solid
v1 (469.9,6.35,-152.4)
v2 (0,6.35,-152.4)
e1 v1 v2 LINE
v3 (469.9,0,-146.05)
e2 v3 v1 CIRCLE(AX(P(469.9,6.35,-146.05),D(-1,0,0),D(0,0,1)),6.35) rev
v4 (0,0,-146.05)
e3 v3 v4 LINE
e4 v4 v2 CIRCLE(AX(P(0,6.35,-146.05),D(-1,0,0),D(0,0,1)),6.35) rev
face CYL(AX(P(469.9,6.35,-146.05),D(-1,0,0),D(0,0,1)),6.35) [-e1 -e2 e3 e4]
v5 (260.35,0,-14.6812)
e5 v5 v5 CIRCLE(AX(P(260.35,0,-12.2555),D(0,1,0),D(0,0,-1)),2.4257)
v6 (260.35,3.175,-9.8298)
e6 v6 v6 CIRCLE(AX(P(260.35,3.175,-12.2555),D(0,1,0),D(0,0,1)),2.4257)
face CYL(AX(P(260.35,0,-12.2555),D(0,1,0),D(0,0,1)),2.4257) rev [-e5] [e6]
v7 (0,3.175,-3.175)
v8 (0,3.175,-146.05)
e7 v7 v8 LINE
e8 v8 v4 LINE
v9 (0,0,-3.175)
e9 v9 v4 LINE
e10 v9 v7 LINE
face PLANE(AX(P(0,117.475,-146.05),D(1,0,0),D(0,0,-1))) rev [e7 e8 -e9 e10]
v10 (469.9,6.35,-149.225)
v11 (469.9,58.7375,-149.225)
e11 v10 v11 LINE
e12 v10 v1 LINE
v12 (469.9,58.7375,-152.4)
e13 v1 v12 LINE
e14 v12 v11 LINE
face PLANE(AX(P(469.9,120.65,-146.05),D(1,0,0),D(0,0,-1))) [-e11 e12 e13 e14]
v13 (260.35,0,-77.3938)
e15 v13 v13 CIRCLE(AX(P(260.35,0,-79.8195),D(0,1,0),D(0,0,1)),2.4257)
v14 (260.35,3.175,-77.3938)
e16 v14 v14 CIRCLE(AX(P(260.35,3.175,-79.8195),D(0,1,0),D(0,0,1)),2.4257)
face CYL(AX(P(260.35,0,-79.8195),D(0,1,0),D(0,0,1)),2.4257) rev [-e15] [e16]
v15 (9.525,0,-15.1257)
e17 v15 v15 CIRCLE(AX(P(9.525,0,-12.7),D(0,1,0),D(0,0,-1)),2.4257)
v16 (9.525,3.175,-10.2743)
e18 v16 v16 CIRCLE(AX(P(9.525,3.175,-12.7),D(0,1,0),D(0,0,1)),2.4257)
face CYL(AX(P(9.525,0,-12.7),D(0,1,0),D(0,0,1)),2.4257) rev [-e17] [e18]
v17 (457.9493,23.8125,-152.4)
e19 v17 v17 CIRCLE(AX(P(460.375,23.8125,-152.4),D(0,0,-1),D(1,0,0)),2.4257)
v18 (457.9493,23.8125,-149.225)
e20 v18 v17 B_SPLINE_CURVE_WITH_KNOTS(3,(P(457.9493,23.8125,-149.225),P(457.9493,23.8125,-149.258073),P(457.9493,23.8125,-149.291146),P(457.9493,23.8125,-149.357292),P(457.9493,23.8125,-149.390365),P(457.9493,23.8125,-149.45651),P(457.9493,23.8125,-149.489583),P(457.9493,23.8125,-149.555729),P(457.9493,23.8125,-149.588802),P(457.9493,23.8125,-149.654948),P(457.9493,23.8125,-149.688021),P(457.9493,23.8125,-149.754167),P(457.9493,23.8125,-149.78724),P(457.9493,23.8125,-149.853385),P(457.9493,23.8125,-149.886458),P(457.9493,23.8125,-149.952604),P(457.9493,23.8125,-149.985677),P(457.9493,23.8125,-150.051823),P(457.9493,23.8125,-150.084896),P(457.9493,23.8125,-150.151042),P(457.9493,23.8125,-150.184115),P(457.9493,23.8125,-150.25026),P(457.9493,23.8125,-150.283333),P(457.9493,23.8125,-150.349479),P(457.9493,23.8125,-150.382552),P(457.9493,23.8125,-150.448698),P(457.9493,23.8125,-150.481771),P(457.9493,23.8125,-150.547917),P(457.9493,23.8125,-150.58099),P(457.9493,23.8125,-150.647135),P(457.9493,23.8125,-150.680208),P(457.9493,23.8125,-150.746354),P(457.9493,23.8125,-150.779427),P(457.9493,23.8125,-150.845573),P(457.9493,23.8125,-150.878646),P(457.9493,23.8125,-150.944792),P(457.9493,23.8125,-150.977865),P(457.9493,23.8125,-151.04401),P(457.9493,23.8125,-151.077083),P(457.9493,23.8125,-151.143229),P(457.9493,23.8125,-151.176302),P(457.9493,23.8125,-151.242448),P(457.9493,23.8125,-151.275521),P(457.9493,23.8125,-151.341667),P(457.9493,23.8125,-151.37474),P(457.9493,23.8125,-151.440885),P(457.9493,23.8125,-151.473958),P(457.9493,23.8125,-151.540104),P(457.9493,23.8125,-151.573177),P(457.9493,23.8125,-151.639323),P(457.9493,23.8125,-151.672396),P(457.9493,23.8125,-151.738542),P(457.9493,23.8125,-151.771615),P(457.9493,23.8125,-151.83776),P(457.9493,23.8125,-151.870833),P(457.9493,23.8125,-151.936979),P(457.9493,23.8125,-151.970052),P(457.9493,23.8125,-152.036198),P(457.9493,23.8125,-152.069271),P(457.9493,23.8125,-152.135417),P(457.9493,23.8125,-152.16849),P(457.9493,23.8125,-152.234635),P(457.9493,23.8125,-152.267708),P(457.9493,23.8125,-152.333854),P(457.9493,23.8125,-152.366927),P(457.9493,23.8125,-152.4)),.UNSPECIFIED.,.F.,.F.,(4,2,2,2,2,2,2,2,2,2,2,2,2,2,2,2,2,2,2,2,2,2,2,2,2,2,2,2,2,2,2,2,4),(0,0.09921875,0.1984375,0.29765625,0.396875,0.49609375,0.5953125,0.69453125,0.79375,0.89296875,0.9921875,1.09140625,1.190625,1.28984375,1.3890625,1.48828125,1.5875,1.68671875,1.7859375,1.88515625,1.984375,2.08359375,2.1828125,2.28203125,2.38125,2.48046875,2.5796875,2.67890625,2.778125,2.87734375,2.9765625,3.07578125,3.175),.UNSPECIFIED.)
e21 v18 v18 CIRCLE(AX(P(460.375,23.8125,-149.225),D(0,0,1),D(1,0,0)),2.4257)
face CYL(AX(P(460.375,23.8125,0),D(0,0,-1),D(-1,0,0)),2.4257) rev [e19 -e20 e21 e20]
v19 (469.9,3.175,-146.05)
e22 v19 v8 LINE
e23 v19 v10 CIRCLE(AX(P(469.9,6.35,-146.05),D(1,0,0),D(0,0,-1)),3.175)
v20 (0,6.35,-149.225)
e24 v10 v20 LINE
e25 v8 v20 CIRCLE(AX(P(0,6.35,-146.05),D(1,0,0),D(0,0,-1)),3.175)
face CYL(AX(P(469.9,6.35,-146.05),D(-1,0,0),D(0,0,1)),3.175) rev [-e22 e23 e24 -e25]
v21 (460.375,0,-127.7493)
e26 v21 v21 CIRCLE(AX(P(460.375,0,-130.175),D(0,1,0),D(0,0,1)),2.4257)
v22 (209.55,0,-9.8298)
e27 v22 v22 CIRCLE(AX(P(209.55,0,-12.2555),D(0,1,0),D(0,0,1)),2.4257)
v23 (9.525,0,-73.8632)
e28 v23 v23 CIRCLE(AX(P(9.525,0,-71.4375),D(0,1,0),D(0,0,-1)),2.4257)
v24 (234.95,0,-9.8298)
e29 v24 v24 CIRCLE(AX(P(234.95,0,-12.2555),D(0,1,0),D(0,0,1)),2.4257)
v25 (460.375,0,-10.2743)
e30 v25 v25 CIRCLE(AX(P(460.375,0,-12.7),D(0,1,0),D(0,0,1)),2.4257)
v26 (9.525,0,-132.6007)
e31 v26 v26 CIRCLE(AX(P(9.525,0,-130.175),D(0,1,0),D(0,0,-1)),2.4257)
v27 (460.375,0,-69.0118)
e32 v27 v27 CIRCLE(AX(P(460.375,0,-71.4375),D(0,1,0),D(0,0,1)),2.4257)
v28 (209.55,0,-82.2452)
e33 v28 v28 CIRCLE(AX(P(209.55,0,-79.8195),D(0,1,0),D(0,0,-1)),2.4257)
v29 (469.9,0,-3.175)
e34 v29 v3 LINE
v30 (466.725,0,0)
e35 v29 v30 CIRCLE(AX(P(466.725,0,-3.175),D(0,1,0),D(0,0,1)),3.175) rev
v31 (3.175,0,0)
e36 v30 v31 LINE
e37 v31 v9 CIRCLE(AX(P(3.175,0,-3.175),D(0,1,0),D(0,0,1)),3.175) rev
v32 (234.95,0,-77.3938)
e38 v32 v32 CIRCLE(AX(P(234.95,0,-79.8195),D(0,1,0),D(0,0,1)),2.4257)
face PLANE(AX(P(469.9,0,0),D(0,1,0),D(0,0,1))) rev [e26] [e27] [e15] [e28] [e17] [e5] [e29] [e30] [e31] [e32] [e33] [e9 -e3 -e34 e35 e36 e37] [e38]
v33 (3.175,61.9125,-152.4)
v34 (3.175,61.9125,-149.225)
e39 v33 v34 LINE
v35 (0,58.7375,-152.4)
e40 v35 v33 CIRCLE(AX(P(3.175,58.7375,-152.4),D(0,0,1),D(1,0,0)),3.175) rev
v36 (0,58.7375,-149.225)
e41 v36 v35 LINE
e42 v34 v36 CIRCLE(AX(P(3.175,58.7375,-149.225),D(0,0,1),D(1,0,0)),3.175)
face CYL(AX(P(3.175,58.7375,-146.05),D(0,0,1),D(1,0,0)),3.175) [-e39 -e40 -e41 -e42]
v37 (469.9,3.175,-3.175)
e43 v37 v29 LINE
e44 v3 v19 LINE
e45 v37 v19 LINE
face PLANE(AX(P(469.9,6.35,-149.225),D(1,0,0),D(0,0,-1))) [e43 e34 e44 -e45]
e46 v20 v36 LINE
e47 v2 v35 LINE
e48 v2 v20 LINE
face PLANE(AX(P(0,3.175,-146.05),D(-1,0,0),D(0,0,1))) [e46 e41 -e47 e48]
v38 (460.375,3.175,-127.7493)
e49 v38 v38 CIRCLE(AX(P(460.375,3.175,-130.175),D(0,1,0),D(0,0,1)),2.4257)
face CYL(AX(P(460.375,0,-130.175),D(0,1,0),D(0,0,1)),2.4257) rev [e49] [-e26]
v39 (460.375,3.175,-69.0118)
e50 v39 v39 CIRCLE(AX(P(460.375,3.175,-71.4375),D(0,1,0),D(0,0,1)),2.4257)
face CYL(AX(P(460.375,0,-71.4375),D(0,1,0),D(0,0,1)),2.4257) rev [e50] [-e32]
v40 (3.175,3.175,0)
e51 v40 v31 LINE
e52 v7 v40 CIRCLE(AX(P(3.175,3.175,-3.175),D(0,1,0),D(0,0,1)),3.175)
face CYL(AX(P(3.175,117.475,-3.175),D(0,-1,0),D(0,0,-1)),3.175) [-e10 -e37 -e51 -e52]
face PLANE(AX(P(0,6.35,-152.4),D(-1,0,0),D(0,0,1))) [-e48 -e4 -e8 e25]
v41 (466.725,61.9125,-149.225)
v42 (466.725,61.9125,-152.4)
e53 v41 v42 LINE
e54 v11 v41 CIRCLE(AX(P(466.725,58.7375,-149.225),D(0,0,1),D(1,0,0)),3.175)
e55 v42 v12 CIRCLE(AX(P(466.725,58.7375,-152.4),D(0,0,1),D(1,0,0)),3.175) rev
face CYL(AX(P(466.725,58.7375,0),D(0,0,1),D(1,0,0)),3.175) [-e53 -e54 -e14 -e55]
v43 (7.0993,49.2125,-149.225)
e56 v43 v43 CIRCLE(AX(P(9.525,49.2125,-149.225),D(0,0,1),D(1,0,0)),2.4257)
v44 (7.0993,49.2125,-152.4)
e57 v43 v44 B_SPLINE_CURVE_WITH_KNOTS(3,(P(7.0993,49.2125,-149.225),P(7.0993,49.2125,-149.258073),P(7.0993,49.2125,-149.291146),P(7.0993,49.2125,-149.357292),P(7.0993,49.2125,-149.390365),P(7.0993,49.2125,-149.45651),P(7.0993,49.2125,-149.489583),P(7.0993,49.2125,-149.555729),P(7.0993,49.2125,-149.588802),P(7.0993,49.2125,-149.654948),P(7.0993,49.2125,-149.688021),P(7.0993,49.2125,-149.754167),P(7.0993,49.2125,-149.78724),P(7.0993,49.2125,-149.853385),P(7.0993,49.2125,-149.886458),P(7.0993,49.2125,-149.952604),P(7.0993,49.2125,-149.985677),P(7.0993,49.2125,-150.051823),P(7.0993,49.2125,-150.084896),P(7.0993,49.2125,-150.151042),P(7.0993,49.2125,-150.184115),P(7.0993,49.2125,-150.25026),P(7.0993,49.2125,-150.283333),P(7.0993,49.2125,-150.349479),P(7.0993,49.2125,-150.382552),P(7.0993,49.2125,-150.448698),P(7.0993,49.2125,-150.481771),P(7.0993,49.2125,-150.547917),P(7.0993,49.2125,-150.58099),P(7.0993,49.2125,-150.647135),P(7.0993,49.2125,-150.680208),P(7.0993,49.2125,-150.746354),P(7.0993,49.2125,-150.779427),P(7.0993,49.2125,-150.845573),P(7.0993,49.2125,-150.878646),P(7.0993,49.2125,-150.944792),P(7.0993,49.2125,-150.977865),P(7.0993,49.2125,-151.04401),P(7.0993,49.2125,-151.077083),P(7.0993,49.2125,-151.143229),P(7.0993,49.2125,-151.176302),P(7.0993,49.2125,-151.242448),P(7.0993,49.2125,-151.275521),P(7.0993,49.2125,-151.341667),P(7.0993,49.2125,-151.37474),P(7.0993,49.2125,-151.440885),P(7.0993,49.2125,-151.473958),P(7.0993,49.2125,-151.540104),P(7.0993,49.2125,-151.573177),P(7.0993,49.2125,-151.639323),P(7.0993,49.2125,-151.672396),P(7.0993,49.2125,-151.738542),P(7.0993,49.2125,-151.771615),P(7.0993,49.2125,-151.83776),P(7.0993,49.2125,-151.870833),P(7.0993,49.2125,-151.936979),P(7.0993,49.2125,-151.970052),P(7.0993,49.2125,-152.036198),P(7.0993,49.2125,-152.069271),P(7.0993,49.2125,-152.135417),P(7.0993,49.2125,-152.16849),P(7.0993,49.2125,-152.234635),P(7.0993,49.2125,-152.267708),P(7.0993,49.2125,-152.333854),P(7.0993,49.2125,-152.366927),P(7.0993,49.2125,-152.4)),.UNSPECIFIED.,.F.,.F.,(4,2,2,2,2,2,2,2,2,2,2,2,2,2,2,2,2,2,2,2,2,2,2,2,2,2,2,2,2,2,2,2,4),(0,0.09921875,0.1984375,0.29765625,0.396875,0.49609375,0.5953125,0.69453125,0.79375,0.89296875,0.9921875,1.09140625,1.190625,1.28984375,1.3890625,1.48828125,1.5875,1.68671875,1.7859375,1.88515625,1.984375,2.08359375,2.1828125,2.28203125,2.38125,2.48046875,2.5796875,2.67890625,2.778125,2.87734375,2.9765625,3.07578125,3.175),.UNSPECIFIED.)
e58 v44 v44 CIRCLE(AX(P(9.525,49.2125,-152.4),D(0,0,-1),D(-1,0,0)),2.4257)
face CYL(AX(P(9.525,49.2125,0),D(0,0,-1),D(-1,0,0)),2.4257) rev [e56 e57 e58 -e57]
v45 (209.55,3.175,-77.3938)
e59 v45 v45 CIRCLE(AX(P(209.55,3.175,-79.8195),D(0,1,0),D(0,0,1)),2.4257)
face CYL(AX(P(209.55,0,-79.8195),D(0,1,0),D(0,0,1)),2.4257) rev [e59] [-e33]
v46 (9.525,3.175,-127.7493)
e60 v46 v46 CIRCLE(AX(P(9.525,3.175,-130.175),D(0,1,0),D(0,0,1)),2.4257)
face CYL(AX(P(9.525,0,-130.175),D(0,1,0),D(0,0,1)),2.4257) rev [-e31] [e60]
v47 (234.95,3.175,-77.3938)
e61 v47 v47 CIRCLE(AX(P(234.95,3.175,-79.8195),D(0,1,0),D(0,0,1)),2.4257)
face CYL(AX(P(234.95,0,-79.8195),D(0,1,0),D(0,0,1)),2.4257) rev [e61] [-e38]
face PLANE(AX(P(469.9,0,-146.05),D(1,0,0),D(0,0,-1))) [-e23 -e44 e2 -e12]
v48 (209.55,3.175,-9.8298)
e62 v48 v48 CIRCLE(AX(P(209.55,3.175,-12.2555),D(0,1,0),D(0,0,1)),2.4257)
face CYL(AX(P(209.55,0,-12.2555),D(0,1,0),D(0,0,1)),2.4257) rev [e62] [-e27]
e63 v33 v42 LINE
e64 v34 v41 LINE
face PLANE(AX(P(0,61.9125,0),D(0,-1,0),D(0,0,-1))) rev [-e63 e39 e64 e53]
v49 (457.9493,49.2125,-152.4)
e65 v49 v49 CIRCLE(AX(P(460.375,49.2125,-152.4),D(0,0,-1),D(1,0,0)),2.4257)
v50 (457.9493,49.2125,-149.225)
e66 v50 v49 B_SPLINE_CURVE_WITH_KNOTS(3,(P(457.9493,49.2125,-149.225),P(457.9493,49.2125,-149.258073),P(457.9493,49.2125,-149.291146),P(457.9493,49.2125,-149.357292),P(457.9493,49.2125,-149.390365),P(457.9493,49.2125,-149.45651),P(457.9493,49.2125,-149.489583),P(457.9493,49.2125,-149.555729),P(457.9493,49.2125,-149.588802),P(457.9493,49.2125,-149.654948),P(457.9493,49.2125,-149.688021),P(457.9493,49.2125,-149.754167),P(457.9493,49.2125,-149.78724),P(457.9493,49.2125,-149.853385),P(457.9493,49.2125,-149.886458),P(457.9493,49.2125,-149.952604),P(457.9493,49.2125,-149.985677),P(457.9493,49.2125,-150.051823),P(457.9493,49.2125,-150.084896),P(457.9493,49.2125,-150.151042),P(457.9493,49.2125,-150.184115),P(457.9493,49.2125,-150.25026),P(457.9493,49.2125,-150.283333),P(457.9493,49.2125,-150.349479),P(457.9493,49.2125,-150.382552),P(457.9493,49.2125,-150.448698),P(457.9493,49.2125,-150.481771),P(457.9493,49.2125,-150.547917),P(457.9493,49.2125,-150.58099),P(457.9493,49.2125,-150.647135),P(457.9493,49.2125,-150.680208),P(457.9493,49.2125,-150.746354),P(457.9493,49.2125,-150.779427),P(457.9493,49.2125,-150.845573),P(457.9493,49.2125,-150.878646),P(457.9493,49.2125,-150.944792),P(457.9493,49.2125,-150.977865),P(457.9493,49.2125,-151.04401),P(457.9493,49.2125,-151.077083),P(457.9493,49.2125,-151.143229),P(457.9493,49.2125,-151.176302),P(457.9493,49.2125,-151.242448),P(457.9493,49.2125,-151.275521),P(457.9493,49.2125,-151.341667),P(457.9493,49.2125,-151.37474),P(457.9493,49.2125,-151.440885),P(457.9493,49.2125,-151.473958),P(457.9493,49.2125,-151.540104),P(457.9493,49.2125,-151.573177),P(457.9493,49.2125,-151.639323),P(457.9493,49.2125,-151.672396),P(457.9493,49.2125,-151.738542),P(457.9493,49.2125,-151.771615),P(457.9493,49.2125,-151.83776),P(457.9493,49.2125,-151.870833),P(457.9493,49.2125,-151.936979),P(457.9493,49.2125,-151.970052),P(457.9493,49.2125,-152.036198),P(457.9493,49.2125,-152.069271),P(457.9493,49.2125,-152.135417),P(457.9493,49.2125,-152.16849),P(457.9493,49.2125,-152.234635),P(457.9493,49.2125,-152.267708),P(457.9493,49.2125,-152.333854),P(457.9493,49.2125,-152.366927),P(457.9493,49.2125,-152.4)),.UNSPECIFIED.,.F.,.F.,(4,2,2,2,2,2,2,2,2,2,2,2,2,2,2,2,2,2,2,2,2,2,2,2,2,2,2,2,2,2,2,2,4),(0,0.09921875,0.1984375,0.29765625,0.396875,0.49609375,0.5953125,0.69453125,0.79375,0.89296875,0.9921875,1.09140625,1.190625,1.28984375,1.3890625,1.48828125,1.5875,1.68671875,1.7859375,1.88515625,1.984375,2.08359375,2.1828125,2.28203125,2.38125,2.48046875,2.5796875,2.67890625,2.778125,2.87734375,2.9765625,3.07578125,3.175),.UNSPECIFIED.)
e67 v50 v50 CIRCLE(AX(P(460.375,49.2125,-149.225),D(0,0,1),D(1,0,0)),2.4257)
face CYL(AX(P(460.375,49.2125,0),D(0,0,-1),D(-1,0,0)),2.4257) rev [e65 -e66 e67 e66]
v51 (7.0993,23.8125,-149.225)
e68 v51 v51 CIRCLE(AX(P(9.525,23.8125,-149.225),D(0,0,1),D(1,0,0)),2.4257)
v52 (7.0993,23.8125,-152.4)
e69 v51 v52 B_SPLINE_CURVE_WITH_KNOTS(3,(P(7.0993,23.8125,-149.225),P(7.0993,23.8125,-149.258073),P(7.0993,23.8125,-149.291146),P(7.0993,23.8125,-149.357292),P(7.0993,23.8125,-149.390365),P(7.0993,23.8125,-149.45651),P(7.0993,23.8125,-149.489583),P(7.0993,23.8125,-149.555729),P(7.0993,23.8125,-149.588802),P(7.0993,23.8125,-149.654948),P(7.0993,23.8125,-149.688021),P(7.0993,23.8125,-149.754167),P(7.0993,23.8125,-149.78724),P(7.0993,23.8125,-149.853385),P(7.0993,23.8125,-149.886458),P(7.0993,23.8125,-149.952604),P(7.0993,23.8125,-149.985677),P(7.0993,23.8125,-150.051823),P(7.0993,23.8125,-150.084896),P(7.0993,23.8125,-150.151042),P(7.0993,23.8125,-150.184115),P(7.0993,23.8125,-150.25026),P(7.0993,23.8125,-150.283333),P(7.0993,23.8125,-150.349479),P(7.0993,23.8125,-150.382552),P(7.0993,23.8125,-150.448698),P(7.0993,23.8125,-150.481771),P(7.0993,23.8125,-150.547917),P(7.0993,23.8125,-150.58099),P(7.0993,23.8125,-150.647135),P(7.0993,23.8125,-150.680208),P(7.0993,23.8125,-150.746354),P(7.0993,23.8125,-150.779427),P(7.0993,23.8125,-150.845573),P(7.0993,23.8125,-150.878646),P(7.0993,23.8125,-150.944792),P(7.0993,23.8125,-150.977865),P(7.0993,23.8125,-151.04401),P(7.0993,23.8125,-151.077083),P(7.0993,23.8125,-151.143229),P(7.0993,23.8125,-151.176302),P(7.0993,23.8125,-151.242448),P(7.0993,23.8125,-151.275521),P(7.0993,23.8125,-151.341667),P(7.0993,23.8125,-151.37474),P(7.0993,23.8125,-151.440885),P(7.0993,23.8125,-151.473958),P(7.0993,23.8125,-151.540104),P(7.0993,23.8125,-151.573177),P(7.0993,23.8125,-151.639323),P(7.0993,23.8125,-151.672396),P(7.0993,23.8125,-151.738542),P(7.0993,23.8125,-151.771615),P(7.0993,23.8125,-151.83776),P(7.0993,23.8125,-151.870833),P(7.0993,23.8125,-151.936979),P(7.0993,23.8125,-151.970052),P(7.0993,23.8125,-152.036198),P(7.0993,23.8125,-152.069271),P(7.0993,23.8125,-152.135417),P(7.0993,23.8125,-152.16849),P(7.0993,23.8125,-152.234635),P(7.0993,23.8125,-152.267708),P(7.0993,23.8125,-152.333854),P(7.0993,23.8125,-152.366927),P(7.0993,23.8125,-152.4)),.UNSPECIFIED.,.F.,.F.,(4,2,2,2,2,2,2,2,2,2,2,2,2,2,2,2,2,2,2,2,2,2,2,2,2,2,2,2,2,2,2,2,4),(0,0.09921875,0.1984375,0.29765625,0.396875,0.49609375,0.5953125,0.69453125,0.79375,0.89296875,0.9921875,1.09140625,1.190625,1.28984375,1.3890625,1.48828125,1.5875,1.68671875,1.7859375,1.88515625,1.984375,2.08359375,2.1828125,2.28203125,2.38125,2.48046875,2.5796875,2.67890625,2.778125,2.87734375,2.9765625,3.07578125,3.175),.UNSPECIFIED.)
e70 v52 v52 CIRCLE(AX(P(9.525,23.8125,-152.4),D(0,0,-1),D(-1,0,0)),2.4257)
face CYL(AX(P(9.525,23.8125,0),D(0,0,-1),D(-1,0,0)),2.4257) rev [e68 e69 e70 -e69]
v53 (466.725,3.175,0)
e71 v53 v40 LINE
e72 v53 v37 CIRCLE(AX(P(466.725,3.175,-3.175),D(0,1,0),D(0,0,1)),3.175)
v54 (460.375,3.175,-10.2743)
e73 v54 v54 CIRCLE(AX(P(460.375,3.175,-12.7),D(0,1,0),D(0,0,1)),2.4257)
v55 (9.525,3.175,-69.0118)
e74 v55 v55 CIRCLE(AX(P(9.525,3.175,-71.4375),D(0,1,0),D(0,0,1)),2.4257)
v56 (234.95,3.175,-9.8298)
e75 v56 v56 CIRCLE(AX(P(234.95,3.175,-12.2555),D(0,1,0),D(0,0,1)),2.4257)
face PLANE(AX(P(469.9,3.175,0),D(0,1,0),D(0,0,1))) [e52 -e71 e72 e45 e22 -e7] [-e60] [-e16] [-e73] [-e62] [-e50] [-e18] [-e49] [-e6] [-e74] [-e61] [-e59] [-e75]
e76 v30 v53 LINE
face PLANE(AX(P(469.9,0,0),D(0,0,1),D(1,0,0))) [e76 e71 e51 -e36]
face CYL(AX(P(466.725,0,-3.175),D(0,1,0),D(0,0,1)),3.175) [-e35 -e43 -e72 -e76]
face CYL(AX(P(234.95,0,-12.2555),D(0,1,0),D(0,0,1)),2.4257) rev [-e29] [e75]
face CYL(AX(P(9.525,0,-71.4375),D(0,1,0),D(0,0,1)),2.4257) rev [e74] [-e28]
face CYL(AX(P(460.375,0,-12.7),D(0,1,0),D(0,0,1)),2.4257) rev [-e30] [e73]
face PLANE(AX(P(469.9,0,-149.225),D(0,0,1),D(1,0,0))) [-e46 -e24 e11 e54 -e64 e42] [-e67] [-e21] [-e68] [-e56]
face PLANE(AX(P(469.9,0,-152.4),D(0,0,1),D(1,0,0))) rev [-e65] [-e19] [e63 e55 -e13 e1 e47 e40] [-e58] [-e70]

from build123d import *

# Parameters (mm, degrees)
BASE_FLANGE1_DEPTH = 469.9
SKETCH6_R          = 21.9075
CUT_EXTRUDE1_DEPTH = 3.175
SKETCH7_R          = 2.4257
CUT_EXTRUDE2_DEPTH = 510.278313523
SKETCH8_R          = 2.4257
CUT_EXTRUDE3_DEPTH = 510.278313523
SKETCH9_R          = 2.4257
CUT_EXTRUDE4_DEPTH = 510.278313523
FILLET1_R          = 3.175
SKETCH10_W         = 152.4
SKETCH10_H         = 61.9125
CUT_EXTRUDE6_DEPTH = 510.278313523
FILLET2_R          = 3.175


# Sheet-metal steps are written as plain solids
with BuildPart() as part:
    # Sketch1 → Base-Flange1 (new body)
    with BuildSketch(Plane(origin=(0, 0, 0), x_dir=(0, 0, -1), z_dir=(1, 0, 0))):
        with BuildLine():
            Line((0, 0), (146.05, 0))
            ThreePointArc((146.05, 0), (150.540128061, 1.859871939), (152.4, 6.35))
            Line((152.4, 6.35), (152.4, 117.475))
            ThreePointArc((152.4, 117.475), (150.540128061, 121.965128061), (146.05, 123.825))
            Line((146.05, 123.825), (0, 123.825))
            Line((0, 123.825), (0, 120.65))
            Line((0, 120.65), (146.05, 120.65))
            ThreePointArc((146.05, 120.65), (148.29506403, 119.72006403), (149.225, 117.475))
            Line((149.225, 117.475), (149.225, 6.35))
            ThreePointArc((149.225, 6.35), (148.29506403, 4.10493597), (146.05, 3.175))
            Line((146.05, 3.175), (0, 3.175))
            Line((0, 3.175), (0, 0))
        make_face()
    extrude(amount=BASE_FLANGE1_DEPTH)

    # Sketch6 → Cut-Extrude1 (cut)
    with BuildSketch(Plane(origin=(0, 123.825, 0), x_dir=(1, 0, 0), z_dir=(0, 1, 0))):
        with Locations(Location((234.95, 46.0375, 0), (0, 0, 270))):
            Circle(SKETCH6_R)
    extrude(amount=-CUT_EXTRUDE1_DEPTH, mode=Mode.SUBTRACT)

    # Sketch7 → Cut-Extrude2 (cut, through all)
    with BuildSketch(Plane(origin=(0, 123.825, 0), x_dir=(1, 0, 0), z_dir=(0, 1, 0))):
        with Locations(Location((234.95, 12.2555, 0), (0, 0, 270))):
            Circle(SKETCH7_R)
        with Locations(Location((234.95, 79.8195, 0), (0, 0, 270))):
            Circle(SKETCH7_R)
        with Locations(Location((209.55, 12.2555, 0), (0, 0, 270))):
            Circle(SKETCH7_R)
        with Locations(Location((260.35, 12.2555, 0), (0, 0, 270))):
            Circle(SKETCH7_R)
        with Locations(Location((260.35, 79.8195, 0), (0, 0, 270))):
            Circle(SKETCH7_R)
        with Locations(Location((209.55, 79.8195, 0), (0, 0, 270))):
            Circle(SKETCH7_R)
    extrude(amount=-CUT_EXTRUDE2_DEPTH, mode=Mode.SUBTRACT)

    # Sketch8 → Cut-Extrude3 (cut, through all)
    with BuildSketch(Plane(origin=(0, 123.825, 0), x_dir=(1, 0, 0), z_dir=(0, 1, 0))):
        with Locations(Location((460.375, 12.7, 0), (0, 0, 270))):
            Circle(SKETCH8_R)
        with Locations(Location((460.375, 71.4375, 0), (0, 0, 270))):
            Circle(SKETCH8_R)
        with Locations(Location((460.375, 130.175, 0), (0, 0, 270))):
            Circle(SKETCH8_R)
        with Locations(Location((9.525, 130.175, 0), (0, 0, 270))):
            Circle(SKETCH8_R)
        with Locations(Location((9.525, 71.4375, 0), (0, 0, 270))):
            Circle(SKETCH8_R)
        with Locations(Location((9.525, 12.7, 0), (0, 0, 270))):
            Circle(SKETCH8_R)
    extrude(amount=-CUT_EXTRUDE3_DEPTH, mode=Mode.SUBTRACT)

    # Sketch9 → Cut-Extrude4 (cut, through all)
    with BuildSketch(Plane(origin=(0, 0, -152.4), x_dir=(-1, 0, 0), z_dir=(0, 0, -1))):
        with Locations((-460.375, 74.6125)):
            Circle(SKETCH9_R)
        with Locations((-460.375, 49.2125)):
            Circle(SKETCH9_R)
        with Locations((-9.525, 49.2125)):
            Circle(SKETCH9_R)
        with Locations((-9.525, 74.6125)):
            Circle(SKETCH9_R)
        with Locations((-460.375, 100.0125)):
            Circle(SKETCH9_R)
        with Locations((-460.375, 23.8125)):
            Circle(SKETCH9_R)
        with Locations((-9.525, 23.8125)):
            Circle(SKETCH9_R)
        with Locations((-9.525, 100.0125)):
            Circle(SKETCH9_R)
    extrude(amount=-CUT_EXTRUDE4_DEPTH, mode=Mode.SUBTRACT)

    # Fillet1
    fillet1_edges = [part.edges().sort_by_distance(p)[0] for p in [
        (0, 1.5875, 0),
        (0, 122.2375, 0),
        (469.9, 1.5875, 0),
        (469.9, 122.2375, 0),
    ]]
    fillet(fillet1_edges, radius=FILLET1_R)

    # Sketch10 → Cut-Extrude6 (cut, through all)
    with BuildSketch(Plane(origin=(469.9, 0, 0), x_dir=(0, 0, -1), z_dir=(1, 0, 0))):
        with Locations((76.2, 92.86875)):
            Rectangle(SKETCH10_W, SKETCH10_H)
    extrude(amount=-CUT_EXTRUDE6_DEPTH, mode=Mode.SUBTRACT)

    # Fillet2
    fillet2_edges = [part.edges().sort_by_distance(p)[0] for p in [
        (469.9, 61.9125, -150.8125),
        (0, 61.9125, -150.8125),
    ]]
    fillet(fillet2_edges, radius=FILLET2_R)


solid = part.part
